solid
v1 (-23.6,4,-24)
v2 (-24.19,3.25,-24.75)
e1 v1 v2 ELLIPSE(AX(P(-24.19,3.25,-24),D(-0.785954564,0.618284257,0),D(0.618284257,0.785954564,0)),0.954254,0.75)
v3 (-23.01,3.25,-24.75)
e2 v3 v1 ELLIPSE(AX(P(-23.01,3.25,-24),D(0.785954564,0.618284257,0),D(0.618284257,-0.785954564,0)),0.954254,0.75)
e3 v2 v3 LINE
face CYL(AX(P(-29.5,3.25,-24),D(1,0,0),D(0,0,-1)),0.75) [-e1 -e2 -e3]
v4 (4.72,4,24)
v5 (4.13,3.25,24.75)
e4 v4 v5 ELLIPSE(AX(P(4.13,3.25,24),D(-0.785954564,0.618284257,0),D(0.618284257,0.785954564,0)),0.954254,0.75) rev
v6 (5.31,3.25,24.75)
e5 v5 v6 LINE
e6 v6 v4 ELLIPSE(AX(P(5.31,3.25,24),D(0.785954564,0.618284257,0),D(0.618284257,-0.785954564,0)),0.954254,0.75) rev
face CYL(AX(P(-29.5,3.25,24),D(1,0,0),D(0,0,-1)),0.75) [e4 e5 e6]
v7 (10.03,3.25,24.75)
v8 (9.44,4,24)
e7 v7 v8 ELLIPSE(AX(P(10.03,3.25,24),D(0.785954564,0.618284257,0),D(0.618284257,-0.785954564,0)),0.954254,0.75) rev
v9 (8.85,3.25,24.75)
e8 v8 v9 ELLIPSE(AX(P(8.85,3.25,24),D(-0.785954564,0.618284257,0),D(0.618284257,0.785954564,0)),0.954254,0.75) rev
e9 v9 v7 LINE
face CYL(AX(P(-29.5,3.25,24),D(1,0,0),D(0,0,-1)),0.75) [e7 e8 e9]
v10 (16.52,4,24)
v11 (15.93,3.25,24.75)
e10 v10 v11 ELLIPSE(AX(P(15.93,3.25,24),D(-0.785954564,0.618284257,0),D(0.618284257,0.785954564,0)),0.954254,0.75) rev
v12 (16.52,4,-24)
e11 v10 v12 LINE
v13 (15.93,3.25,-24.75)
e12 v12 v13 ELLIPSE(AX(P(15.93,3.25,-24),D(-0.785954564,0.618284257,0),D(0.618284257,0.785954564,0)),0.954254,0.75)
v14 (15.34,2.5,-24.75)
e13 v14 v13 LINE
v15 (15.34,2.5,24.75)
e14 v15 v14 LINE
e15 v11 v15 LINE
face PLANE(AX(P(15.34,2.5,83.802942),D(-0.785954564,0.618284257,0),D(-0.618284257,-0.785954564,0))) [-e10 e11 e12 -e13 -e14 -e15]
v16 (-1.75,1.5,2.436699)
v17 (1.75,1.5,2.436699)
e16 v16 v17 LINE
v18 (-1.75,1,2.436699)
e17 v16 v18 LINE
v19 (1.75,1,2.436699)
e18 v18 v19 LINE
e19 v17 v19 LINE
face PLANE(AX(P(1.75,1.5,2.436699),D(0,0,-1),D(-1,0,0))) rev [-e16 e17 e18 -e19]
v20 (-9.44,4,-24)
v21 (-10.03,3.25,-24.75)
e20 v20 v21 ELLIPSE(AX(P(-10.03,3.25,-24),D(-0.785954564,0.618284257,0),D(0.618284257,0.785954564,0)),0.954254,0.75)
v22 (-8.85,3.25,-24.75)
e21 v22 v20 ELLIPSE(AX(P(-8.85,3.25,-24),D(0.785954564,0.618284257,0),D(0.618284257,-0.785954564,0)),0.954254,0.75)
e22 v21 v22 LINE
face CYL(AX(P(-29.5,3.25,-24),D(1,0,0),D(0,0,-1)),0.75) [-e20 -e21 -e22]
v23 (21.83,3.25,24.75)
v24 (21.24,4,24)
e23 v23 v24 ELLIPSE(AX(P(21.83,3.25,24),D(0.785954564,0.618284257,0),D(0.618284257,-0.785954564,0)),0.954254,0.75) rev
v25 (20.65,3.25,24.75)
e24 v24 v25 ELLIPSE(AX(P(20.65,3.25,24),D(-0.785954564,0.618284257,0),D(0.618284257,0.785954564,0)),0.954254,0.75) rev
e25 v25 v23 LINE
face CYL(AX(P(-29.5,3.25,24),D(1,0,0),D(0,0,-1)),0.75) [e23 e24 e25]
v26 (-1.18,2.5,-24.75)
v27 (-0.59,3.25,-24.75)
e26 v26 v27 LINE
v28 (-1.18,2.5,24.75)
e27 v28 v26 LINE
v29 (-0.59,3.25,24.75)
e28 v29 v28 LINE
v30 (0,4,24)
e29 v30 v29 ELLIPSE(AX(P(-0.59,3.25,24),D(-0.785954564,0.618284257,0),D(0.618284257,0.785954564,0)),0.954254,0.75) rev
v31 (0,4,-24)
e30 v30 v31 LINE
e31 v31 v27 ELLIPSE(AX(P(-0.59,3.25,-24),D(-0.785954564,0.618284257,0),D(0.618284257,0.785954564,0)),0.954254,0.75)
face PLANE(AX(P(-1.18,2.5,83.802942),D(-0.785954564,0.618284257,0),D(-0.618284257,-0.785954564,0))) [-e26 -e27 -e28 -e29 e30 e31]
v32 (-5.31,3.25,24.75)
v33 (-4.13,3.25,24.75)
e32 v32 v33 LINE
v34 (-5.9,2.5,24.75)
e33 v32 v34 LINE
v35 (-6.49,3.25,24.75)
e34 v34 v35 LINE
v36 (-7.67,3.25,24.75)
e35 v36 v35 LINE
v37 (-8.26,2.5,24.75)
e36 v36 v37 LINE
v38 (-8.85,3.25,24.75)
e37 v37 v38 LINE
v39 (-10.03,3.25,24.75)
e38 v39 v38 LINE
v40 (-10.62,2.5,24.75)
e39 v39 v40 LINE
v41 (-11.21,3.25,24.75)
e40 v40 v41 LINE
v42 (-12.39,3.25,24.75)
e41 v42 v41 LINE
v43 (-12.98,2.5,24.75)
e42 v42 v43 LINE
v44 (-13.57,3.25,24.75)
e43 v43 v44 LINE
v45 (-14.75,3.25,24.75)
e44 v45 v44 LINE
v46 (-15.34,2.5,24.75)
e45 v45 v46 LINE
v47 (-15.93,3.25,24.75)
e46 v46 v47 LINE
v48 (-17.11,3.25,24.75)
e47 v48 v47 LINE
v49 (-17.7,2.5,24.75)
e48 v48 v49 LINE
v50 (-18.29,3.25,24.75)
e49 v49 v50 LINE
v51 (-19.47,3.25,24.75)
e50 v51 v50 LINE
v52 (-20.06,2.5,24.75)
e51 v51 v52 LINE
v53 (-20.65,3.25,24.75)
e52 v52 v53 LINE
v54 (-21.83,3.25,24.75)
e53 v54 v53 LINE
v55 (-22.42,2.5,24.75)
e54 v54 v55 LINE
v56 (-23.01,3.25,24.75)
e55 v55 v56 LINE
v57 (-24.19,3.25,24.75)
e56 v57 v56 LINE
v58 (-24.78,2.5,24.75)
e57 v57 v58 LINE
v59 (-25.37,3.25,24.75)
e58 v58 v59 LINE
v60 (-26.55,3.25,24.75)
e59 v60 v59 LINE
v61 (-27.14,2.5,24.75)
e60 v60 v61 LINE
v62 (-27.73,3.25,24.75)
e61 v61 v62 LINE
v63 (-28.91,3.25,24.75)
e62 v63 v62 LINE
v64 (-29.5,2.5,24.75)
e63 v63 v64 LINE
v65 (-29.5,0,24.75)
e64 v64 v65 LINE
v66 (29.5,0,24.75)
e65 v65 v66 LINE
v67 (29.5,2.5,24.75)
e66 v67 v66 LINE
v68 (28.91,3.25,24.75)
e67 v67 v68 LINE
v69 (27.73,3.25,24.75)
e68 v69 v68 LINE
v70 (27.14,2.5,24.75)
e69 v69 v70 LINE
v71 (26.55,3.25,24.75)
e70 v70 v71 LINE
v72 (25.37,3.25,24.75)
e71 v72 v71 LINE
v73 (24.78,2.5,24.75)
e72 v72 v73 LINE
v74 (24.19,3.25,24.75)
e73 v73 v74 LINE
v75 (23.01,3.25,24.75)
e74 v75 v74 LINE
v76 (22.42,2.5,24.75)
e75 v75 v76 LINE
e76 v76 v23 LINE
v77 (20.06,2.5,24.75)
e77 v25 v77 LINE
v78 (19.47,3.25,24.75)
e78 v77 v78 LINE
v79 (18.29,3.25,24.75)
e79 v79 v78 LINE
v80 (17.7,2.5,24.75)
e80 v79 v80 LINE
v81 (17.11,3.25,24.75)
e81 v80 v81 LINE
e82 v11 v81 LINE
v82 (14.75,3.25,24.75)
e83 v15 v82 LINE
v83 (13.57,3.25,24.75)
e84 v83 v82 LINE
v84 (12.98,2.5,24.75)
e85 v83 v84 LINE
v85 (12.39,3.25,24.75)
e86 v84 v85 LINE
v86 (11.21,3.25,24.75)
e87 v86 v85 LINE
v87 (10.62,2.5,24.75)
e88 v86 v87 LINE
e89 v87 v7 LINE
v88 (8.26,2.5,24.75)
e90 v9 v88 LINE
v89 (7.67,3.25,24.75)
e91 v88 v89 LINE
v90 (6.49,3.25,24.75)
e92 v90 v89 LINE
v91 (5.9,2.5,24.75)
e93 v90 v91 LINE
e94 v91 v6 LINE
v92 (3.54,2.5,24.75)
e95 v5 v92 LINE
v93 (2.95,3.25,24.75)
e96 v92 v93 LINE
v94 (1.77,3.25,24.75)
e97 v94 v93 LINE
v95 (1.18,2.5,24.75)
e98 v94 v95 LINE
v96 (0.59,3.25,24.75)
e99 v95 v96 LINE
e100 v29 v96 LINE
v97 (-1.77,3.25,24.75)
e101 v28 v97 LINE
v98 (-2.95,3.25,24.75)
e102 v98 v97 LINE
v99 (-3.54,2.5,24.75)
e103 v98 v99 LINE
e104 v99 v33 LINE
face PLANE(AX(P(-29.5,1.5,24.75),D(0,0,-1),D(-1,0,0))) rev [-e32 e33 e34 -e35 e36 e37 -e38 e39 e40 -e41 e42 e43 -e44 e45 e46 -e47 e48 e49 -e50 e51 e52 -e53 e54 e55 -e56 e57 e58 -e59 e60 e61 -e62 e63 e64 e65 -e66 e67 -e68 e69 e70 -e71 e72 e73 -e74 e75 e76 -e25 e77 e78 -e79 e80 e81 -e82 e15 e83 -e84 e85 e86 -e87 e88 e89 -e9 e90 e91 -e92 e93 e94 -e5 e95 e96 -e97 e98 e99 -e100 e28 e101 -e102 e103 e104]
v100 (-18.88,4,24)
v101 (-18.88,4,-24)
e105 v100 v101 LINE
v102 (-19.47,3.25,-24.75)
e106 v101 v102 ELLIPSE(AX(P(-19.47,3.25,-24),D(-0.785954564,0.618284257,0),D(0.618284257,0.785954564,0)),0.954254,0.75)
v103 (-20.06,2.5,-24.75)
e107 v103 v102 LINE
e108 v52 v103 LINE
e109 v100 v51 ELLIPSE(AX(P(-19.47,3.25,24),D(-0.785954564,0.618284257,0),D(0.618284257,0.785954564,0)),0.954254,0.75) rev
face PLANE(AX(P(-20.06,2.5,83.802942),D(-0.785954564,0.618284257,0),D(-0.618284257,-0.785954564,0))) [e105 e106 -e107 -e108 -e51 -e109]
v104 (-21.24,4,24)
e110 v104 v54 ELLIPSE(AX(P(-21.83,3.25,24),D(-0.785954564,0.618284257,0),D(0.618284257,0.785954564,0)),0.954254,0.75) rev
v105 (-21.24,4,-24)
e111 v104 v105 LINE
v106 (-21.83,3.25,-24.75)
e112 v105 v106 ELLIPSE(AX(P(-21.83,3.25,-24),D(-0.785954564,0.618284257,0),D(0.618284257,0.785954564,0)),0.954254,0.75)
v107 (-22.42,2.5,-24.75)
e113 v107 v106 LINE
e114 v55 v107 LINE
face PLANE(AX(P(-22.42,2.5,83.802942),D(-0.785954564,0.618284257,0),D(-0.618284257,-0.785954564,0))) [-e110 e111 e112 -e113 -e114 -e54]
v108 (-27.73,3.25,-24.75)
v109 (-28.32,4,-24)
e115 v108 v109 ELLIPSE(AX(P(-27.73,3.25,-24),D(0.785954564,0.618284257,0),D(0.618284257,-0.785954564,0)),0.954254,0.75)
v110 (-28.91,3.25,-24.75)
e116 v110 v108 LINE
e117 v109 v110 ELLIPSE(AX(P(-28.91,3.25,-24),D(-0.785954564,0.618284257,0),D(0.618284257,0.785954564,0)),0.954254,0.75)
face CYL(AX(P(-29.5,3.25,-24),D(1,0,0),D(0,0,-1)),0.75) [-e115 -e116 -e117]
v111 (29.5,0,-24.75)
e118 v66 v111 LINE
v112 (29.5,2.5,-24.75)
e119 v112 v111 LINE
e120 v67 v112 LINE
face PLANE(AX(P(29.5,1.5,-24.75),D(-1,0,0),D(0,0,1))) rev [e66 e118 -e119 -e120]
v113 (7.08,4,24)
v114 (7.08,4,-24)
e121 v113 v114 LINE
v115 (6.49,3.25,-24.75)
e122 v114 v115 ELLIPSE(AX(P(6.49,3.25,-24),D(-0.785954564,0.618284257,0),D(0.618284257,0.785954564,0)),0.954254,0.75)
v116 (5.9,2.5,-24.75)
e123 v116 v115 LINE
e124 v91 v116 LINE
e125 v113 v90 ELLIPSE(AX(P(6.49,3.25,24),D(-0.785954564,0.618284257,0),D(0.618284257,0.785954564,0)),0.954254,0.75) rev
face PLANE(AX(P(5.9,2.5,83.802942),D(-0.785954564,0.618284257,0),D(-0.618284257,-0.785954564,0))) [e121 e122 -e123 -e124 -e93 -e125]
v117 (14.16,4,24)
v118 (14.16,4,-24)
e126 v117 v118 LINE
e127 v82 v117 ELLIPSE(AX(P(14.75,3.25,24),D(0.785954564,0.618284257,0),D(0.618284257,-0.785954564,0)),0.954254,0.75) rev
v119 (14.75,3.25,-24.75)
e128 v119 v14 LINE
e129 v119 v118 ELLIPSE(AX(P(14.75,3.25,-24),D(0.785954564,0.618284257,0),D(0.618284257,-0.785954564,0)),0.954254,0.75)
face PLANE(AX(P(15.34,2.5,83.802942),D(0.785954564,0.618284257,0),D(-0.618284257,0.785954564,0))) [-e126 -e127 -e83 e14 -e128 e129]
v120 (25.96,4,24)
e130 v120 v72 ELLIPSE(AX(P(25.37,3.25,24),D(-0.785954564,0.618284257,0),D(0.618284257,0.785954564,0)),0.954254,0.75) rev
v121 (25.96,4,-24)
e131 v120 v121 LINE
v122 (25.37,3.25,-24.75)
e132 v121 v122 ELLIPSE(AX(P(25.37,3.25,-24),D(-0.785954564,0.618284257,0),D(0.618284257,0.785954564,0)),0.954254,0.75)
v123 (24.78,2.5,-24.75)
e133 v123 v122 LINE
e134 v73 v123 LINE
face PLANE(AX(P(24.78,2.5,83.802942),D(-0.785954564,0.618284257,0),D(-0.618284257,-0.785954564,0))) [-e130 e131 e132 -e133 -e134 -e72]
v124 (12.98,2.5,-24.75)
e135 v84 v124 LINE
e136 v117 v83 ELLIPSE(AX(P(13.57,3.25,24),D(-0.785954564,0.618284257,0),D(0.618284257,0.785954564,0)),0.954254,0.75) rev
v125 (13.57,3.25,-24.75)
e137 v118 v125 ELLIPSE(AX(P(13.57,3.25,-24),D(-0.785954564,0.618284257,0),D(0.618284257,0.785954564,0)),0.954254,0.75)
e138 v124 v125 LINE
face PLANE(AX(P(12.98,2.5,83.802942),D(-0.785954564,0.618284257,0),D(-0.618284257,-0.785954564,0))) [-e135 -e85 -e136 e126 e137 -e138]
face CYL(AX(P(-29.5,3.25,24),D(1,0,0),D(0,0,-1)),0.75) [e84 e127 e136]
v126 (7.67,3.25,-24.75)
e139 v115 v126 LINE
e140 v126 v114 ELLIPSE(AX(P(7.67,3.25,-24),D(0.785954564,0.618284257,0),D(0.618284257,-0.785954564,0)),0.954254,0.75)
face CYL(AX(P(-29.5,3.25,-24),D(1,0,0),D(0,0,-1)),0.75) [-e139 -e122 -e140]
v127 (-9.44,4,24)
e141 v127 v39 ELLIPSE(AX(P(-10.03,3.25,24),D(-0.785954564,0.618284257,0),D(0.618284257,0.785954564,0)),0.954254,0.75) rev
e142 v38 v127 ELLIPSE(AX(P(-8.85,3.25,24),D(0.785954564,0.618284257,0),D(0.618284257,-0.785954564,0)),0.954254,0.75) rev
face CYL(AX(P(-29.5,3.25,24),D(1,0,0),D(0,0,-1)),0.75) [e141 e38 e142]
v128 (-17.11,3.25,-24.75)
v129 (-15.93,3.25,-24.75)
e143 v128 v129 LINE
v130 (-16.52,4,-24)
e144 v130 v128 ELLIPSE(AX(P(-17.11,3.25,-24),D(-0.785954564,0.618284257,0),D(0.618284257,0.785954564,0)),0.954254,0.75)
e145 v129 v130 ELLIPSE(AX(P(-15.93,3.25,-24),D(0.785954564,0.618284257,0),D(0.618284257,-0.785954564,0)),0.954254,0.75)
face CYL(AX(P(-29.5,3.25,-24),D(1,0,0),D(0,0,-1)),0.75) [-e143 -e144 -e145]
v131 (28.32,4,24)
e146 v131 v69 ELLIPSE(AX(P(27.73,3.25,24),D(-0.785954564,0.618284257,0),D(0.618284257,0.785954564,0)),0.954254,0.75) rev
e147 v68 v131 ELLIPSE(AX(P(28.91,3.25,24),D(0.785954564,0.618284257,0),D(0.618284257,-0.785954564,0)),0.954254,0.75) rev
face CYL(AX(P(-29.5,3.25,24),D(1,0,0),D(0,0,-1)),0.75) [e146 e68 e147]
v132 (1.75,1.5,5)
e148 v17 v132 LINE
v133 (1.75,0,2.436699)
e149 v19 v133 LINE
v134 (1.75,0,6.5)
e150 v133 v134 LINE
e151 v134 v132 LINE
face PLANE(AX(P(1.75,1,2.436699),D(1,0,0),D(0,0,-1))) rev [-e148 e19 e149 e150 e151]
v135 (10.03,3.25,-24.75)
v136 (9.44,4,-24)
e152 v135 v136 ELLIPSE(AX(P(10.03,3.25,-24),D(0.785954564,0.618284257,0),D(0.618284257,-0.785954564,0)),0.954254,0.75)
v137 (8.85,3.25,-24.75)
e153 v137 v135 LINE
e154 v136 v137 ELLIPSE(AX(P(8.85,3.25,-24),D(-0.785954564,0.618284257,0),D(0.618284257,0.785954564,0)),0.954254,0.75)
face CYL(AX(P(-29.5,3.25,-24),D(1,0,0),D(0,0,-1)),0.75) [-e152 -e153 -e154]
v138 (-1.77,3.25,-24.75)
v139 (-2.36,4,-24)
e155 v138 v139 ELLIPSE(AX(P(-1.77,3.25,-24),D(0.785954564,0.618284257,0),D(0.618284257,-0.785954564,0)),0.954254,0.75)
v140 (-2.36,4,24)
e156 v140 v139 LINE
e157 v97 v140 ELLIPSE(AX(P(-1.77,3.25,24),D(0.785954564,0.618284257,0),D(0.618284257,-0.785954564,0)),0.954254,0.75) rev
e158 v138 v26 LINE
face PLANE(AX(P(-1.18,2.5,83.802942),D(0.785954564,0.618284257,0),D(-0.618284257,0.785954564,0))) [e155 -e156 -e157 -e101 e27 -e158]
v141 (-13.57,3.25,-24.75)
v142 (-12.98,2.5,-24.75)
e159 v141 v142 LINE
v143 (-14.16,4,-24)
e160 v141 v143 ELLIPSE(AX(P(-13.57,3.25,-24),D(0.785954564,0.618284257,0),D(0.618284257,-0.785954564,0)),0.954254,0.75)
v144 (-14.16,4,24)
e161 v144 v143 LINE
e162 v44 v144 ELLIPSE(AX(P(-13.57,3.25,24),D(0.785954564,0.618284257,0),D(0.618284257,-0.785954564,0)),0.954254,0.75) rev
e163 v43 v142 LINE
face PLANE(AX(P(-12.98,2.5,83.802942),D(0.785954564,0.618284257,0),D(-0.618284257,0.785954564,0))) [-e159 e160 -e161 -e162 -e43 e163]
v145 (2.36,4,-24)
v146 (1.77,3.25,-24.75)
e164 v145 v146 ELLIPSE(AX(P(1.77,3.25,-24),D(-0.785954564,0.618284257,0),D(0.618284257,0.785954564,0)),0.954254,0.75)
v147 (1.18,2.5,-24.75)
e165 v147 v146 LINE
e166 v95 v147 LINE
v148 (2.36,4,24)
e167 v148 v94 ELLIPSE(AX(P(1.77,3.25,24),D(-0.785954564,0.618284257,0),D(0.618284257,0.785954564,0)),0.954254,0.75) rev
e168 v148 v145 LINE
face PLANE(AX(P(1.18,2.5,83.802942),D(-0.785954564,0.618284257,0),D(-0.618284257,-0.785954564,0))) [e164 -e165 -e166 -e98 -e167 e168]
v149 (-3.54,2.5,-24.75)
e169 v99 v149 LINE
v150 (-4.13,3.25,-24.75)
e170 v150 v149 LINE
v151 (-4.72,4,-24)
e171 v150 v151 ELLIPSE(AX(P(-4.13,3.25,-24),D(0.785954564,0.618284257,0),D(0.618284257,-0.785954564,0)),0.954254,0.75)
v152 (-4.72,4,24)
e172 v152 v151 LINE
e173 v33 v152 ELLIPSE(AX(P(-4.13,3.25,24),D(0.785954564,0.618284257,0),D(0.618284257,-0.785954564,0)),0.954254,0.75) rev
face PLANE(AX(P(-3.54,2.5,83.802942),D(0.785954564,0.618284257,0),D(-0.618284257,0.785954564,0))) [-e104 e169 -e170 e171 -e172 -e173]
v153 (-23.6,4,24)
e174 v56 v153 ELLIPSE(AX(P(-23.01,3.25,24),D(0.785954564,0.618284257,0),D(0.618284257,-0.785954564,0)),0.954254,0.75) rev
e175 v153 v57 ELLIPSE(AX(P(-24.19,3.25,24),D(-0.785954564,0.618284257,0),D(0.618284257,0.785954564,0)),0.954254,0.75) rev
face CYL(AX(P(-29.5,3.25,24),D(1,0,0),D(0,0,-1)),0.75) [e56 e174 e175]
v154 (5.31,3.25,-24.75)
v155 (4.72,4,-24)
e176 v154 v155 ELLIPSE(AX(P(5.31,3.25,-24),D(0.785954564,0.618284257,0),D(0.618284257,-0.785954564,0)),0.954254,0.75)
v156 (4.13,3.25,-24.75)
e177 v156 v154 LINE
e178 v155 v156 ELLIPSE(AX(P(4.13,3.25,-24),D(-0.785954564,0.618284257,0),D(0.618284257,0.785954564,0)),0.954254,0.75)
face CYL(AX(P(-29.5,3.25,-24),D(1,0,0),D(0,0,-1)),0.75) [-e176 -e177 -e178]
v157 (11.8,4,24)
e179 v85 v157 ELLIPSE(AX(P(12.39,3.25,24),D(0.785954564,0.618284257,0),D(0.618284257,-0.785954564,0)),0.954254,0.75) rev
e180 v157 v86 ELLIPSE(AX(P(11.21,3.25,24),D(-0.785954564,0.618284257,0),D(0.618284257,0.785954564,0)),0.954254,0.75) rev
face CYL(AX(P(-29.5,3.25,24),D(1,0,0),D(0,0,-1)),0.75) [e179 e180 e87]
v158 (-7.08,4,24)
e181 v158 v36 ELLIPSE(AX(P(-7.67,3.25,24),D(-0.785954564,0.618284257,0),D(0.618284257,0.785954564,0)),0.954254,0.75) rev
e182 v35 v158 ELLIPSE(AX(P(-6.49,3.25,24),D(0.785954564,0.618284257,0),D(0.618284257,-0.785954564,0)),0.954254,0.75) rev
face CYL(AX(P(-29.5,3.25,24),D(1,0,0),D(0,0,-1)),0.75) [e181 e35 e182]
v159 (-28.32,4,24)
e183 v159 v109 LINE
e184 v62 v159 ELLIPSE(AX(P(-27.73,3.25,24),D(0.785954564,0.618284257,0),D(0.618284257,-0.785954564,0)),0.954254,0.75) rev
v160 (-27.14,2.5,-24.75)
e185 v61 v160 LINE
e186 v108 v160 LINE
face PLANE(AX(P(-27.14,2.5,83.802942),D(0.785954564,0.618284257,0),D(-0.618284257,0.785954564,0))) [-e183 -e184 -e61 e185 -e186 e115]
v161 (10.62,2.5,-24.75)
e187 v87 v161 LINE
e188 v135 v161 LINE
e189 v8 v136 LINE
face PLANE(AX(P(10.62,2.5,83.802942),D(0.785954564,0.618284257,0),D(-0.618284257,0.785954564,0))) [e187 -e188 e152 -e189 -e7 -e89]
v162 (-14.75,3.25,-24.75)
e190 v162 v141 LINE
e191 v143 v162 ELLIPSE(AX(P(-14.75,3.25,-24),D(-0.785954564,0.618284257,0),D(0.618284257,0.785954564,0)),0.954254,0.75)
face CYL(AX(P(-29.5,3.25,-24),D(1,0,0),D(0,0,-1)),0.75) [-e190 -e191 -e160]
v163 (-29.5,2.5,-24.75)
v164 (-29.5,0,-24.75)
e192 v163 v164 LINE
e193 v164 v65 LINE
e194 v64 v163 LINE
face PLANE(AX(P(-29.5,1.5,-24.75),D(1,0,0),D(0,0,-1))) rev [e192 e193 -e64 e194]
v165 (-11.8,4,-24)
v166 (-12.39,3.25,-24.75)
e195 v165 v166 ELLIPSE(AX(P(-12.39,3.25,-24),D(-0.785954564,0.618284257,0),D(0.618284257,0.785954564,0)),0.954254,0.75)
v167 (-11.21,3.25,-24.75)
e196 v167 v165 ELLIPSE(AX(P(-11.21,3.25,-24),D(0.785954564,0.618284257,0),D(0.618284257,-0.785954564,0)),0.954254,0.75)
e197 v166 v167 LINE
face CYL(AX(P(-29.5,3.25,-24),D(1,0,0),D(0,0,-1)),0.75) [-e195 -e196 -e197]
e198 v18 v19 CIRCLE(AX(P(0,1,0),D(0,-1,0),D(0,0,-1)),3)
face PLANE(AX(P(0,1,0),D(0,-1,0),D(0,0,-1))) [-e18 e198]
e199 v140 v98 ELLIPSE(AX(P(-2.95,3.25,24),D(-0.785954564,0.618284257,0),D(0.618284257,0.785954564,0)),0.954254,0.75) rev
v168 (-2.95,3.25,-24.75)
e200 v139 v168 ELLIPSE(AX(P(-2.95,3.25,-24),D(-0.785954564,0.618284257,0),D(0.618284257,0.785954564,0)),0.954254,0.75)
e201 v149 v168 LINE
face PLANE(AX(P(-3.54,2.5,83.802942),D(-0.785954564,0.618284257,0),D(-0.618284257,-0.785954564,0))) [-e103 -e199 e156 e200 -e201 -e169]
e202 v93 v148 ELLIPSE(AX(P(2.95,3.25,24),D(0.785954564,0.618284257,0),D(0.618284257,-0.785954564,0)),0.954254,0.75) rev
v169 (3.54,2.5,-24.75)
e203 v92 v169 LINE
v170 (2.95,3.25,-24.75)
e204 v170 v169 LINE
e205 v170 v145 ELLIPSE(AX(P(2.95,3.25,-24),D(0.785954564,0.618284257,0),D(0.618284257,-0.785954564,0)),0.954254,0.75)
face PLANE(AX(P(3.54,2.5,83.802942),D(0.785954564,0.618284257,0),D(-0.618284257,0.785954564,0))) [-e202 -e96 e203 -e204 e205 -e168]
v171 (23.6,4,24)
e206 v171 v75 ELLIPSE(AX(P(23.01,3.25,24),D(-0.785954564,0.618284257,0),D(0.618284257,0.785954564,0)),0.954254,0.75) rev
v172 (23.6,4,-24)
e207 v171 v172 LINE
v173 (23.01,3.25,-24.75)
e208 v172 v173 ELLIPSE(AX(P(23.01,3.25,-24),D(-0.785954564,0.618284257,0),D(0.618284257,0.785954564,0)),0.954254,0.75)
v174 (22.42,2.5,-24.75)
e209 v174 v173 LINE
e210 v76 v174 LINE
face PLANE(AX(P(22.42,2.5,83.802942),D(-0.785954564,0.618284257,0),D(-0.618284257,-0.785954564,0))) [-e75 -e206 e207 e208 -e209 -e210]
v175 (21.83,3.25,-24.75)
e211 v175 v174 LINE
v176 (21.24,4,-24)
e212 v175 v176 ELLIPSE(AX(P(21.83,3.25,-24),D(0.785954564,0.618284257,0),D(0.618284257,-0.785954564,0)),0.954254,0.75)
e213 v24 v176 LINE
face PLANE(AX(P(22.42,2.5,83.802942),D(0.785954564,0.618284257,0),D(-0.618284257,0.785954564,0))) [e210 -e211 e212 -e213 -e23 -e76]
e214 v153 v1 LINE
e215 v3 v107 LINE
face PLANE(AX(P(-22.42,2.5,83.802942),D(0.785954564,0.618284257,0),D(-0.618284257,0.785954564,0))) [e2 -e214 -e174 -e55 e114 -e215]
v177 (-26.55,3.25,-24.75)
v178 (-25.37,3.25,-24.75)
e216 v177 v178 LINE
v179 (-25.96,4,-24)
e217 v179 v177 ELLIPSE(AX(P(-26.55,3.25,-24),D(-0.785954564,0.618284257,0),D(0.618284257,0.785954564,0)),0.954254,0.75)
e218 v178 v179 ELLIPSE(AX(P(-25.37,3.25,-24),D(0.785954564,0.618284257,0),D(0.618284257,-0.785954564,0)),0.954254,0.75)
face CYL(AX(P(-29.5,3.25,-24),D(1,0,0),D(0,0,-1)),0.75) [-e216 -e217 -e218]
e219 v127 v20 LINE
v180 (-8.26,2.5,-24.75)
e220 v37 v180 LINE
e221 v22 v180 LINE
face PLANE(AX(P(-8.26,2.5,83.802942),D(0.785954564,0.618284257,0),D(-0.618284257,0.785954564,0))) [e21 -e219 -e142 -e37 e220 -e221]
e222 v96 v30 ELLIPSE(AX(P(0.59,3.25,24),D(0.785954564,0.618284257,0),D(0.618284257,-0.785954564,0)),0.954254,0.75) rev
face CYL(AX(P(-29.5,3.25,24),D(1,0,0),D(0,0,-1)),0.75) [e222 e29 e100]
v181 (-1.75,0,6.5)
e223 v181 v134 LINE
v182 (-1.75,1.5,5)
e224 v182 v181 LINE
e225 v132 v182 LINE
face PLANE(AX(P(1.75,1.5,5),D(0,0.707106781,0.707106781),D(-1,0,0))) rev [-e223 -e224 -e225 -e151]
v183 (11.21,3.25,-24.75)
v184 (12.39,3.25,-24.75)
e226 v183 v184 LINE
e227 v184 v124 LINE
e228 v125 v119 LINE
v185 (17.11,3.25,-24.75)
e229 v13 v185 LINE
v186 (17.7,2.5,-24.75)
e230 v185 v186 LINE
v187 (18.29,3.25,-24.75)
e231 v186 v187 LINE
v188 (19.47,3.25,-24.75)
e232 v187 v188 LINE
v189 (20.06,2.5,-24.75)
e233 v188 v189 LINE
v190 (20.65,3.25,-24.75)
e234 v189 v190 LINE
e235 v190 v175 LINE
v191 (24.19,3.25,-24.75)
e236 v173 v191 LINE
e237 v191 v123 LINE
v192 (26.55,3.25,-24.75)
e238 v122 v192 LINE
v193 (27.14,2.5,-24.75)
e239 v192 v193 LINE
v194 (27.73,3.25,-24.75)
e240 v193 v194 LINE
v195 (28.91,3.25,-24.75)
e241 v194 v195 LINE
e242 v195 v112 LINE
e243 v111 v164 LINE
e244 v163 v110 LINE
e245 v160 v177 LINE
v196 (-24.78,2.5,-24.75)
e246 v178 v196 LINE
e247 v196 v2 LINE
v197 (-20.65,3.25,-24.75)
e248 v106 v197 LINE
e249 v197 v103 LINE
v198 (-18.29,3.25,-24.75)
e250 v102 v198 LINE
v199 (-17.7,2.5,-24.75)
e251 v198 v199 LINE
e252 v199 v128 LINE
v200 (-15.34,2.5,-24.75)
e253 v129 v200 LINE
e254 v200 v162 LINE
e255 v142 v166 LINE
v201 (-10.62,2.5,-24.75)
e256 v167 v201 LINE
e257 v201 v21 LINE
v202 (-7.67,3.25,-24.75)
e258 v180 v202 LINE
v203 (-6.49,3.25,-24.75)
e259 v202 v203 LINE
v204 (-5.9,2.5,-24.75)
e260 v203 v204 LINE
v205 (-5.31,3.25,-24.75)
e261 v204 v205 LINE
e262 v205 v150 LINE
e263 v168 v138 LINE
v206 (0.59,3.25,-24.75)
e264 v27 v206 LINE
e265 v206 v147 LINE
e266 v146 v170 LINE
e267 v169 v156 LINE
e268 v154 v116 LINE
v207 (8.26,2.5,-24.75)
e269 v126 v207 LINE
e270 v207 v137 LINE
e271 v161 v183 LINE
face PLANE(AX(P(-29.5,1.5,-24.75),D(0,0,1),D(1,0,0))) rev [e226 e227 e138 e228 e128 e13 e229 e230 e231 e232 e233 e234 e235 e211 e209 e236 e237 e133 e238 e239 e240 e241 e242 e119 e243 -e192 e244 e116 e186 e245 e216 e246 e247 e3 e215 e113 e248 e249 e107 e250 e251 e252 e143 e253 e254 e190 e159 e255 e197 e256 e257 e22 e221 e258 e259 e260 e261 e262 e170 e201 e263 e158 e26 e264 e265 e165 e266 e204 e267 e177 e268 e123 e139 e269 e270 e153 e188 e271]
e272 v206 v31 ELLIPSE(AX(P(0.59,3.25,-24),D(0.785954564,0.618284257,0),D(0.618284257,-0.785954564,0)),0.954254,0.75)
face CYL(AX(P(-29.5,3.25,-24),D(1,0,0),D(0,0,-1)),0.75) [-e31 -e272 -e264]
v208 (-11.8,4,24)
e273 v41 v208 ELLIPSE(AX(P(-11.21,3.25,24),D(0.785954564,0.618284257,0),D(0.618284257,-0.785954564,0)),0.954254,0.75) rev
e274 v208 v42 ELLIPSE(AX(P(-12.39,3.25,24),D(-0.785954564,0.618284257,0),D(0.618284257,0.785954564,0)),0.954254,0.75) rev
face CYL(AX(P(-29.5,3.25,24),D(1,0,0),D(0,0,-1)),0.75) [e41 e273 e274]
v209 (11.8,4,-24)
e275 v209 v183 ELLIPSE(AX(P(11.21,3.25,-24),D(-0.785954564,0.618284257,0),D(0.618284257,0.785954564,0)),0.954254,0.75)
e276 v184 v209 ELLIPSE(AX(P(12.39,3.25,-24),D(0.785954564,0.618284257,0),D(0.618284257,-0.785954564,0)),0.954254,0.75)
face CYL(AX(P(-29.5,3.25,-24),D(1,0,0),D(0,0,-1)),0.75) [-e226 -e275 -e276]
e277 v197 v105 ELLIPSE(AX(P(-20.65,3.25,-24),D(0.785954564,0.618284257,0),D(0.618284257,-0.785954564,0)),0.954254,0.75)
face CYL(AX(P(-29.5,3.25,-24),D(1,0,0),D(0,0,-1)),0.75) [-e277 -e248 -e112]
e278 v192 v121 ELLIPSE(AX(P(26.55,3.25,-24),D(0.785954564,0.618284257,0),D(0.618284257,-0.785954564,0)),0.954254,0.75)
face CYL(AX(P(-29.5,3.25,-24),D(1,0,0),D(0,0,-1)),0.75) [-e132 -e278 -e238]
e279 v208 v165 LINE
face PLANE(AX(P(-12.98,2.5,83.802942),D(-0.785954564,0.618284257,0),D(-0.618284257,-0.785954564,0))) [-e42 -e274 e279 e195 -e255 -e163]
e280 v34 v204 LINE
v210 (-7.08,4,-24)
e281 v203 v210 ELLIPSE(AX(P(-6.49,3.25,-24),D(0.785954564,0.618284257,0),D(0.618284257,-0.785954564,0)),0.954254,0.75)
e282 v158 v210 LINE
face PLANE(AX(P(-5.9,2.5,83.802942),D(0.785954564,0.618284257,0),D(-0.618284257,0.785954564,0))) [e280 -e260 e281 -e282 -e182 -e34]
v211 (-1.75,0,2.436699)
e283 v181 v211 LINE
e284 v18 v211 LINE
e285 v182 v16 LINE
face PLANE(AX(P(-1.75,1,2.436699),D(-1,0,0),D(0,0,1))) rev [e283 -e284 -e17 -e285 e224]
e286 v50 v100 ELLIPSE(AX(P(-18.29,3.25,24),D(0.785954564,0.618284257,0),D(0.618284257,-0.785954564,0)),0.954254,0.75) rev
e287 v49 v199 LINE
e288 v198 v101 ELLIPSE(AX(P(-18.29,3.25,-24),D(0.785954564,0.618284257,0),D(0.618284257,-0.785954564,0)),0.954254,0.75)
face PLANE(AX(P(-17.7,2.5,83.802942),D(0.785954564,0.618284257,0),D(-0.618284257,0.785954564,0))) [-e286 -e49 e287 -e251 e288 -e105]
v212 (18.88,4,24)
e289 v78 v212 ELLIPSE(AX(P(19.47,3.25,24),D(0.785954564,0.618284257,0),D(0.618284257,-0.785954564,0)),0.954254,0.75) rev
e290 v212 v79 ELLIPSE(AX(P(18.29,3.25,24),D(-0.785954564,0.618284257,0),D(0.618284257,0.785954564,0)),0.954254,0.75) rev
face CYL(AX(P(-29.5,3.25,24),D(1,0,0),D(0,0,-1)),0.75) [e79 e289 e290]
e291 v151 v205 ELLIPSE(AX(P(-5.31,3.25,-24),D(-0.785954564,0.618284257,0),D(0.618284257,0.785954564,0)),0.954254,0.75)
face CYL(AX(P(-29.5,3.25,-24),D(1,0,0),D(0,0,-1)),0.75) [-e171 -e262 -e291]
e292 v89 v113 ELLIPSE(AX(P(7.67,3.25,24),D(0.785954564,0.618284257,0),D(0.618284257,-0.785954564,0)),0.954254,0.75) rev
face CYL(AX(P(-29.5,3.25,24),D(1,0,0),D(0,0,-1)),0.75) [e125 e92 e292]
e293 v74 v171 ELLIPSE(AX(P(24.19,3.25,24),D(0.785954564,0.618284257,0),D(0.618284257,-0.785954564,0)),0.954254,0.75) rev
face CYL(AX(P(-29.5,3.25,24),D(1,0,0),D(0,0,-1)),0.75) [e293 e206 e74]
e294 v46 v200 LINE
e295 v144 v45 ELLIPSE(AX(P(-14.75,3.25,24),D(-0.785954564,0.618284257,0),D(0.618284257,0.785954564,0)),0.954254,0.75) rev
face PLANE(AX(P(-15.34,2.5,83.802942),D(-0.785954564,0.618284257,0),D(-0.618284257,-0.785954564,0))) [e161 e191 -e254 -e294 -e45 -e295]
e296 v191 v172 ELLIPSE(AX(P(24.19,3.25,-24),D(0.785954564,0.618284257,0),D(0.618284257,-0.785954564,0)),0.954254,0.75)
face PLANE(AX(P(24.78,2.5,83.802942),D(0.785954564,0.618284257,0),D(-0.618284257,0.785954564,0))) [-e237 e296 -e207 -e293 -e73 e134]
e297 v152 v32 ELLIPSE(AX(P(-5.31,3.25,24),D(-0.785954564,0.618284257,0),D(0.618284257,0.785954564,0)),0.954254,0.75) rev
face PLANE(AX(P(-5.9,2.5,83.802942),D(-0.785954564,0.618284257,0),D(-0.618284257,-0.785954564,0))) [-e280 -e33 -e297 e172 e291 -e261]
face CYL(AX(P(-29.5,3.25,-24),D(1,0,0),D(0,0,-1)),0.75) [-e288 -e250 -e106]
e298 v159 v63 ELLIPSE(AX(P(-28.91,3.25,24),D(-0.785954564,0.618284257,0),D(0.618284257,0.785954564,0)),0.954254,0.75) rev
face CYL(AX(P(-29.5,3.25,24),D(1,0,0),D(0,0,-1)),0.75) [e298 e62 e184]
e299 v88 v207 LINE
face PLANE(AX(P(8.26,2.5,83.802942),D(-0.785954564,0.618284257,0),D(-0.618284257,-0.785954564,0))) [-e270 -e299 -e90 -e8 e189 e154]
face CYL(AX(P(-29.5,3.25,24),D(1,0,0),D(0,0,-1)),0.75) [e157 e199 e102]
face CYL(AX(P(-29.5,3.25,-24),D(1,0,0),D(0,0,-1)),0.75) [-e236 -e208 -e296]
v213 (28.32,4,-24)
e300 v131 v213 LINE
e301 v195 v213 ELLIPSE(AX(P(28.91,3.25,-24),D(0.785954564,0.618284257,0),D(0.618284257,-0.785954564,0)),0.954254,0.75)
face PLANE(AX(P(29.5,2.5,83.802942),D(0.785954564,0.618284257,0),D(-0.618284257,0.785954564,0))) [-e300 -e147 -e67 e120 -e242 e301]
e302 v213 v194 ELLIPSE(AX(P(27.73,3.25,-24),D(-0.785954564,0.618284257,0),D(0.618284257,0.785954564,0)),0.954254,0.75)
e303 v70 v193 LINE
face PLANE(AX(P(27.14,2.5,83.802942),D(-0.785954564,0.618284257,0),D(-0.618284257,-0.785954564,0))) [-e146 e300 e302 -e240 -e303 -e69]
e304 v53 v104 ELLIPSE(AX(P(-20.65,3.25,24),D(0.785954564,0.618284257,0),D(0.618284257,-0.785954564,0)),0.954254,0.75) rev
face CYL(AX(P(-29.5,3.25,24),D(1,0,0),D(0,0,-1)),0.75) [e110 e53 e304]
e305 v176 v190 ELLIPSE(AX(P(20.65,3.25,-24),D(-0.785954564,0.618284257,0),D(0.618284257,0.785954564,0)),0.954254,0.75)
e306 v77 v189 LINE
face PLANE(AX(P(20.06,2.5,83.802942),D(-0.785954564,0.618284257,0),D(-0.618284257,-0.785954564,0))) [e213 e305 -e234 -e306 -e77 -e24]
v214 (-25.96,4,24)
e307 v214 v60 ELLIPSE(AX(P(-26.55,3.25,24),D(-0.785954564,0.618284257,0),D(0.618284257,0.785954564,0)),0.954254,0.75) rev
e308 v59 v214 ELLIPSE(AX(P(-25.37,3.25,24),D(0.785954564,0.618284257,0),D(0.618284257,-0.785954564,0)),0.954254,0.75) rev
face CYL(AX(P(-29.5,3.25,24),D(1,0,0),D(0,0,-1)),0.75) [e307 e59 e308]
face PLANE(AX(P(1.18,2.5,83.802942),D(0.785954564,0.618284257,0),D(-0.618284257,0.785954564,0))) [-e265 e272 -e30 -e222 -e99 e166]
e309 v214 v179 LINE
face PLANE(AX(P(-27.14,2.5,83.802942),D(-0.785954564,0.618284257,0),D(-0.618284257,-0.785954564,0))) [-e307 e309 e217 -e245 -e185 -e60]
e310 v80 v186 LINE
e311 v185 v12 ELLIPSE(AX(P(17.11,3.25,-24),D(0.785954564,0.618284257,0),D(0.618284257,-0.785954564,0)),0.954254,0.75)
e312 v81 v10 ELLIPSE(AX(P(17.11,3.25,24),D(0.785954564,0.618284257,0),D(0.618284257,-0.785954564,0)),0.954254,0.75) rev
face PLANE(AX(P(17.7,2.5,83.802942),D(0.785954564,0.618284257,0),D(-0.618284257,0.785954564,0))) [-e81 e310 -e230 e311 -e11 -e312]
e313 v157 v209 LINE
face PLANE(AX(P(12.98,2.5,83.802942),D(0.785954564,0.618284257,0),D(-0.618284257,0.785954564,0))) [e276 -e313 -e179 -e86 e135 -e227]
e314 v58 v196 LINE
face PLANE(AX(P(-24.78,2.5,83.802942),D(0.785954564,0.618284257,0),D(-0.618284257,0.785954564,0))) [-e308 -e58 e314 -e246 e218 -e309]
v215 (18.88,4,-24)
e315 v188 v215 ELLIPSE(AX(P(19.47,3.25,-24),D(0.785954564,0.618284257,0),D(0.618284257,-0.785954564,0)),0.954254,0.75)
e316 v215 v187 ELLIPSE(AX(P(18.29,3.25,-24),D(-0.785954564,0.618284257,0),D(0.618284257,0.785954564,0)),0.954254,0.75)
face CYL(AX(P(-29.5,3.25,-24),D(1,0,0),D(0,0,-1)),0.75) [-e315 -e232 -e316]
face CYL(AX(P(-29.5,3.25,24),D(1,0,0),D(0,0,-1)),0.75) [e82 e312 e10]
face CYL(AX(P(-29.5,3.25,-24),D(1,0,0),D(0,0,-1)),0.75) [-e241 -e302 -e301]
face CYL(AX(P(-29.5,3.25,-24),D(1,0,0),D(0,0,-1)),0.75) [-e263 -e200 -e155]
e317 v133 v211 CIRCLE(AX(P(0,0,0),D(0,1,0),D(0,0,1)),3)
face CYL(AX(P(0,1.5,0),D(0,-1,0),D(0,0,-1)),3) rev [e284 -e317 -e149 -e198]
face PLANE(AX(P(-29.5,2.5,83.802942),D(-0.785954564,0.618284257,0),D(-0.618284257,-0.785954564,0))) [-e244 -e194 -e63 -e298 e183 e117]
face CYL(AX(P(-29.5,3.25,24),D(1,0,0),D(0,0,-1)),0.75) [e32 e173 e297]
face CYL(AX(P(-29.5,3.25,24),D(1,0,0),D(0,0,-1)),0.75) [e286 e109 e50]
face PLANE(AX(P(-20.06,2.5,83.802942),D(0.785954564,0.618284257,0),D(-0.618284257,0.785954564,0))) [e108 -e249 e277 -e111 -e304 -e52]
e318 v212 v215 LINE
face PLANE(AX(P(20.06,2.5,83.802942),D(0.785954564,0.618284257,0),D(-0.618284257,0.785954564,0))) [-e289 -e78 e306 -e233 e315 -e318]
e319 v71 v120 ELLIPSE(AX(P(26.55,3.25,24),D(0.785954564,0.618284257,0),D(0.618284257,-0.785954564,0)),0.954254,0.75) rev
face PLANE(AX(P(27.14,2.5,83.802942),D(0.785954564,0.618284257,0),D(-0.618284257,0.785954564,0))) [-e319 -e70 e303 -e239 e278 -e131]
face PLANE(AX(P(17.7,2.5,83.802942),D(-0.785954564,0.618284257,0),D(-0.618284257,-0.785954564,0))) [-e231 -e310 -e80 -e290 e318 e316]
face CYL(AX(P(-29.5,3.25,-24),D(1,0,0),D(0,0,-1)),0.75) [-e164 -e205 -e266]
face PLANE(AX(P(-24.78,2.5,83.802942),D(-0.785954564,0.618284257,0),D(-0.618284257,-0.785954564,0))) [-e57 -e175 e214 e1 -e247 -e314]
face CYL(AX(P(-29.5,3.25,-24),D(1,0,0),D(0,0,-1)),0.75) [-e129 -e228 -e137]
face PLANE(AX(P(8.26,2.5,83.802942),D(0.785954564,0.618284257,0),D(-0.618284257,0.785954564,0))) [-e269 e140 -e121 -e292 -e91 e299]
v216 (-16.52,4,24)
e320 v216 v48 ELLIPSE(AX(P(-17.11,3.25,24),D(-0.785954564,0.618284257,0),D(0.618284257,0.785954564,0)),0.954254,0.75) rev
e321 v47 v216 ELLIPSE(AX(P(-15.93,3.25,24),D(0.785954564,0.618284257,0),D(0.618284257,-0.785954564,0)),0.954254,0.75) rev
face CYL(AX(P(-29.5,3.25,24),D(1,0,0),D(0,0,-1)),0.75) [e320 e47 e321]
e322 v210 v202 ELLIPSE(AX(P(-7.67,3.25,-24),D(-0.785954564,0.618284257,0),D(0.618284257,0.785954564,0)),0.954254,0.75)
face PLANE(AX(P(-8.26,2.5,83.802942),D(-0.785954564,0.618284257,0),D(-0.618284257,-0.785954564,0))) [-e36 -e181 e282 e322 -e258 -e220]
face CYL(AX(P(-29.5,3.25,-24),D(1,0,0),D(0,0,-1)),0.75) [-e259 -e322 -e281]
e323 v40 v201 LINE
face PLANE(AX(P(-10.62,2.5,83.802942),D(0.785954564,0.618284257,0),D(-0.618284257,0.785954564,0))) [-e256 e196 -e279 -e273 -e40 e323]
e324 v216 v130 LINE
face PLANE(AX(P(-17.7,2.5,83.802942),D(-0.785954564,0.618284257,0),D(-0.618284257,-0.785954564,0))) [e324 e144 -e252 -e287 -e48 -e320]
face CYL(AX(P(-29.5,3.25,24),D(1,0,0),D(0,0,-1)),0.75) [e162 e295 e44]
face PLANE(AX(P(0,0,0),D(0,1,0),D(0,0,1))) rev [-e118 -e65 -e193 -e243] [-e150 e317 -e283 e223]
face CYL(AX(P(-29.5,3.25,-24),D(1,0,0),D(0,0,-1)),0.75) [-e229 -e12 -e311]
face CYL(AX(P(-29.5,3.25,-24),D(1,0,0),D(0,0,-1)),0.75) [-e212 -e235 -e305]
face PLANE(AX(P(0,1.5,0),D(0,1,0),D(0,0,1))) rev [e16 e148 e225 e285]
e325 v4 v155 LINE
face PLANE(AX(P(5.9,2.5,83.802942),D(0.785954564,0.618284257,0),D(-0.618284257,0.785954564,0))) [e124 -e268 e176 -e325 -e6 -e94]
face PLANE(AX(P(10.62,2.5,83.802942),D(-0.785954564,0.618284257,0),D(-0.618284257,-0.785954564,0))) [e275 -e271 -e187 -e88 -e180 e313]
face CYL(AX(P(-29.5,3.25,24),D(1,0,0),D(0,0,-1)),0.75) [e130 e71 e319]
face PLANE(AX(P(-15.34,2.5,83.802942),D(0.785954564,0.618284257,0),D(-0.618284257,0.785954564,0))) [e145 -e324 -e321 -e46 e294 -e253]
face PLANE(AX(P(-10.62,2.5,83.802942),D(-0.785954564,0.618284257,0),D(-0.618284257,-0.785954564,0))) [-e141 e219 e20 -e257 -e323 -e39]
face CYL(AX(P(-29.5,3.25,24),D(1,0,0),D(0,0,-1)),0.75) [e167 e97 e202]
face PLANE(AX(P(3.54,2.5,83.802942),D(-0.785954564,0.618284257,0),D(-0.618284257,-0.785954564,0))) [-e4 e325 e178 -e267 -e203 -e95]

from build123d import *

# Parameters (mm, degrees)
SKETCH1_W           = 59
SKETCH1_H           = 49.5
SKETCH1_R           = 3
BOSS_EXTRUDE1_DEPTH = 1.5
BOSS_EXTRUDE2_DEPTH = 49.5
CUT_EXTRUDE1_DEPTH  = 1
CUT_EXTRUDE3_DEPTH  = 65.105869466
BOSS_EXTRUDE3_START = 0.5
SKETCH5_R           = 3
BOSS_EXTRUDE3_DEPTH = 0.5
SKETCH6_W           = 3.5
SKETCH6_H           = 2.563301414
CUT_EXTRUDE4_DEPTH  = 0.5
CHAMFER3_SIZE       = 1.5


with BuildPart() as part:
    # Sketch1 → Boss-Extrude1 (new body)
    with BuildSketch(Plane(origin=(0, 0, 0), x_dir=(1, 0, 0), z_dir=(0, 1, 0))):
        Rectangle(SKETCH1_W, SKETCH1_H)
        with Locations(Location((0, 0, 0), (0, 0, 270))):
            Circle(SKETCH1_R, mode=Mode.SUBTRACT)
    extrude(amount=BOSS_EXTRUDE1_DEPTH)

    # Sketch2 → Boss-Extrude2 (add)
    with BuildSketch(Plane(origin=(0, 0, -24.75), x_dir=(-1, 0, 0), z_dir=(0, 0, -1))):
        Polygon((-29.5, 1.5), (29.5, 1.5), (29.5, 2.5), (28.32, 4), (27.14, 2.5), (25.96, 4), (24.78, 2.5), (23.6, 4), (22.42, 2.5), (21.24, 4), (20.06, 2.5), (18.88, 4), (17.7, 2.5), (16.52, 4), (15.34, 2.5), (14.16, 4), (12.98, 2.5), (11.8, 4), (10.62, 2.5), (9.44, 4), (8.26, 2.5), (7.08, 4), (5.9, 2.5), (4.72, 4), (3.54, 2.5), (2.36, 4), (1.18, 2.5), (0, 4), (-1.18, 2.5), (-2.36, 4), (-3.54, 2.5), (-4.72, 4), (-5.9, 2.5), (-7.08, 4), (-8.26, 2.5), (-9.44, 4), (-10.62, 2.5), (-11.8, 4), (-12.98, 2.5), (-14.16, 4), (-15.34, 2.5), (-16.52, 4), (-17.7, 2.5), (-18.88, 4), (-20.06, 2.5), (-21.24, 4), (-22.42, 2.5), (-23.6, 4), (-24.78, 2.5), (-25.96, 4), (-27.14, 2.5), (-28.32, 4), (-29.5, 2.5), align=None)
    extrude(amount=-BOSS_EXTRUDE2_DEPTH)

    # Sketch3 → Cut-Extrude1 (cut)
    with BuildSketch(Plane(origin=(0, 0, 0), x_dir=(-1, 0, 0), z_dir=(0, -1, 0))):
        with BuildLine():
            Line((-1.75, -2.436698586), (-1.75, -5))
            Line((-1.75, -5), (1.75, -5))
            Line((1.75, -5), (1.75, -2.436698586))
            ThreePointArc((1.75, -2.436698586), (0, 3), (-1.75, -2.436698586))
        make_face()
    extrude(amount=-CUT_EXTRUDE1_DEPTH, mode=Mode.SUBTRACT)

    # Sketch4 → Cut-Extrude3 (cut, through all)
    with BuildSketch(Plane(origin=(29.5, 0, 0), x_dir=(0, 0, -1), z_dir=(1, 0, 0))):
        with BuildLine():
            Line((-24, 4), (-24.75, 4))
            Line((-24.75, 4), (-24.75, 3.25))
            ThreePointArc((-24.75, 3.25), (-24.530330086, 3.780330086), (-24, 4))
        make_face()
    cut_extrude3 = extrude(amount=-CUT_EXTRUDE3_DEPTH, mode=Mode.SUBTRACT)

    # Mirror1: Cut-Extrude3 across plane
    add(cut_extrude3.mirror(Plane.XY), mode=Mode.SUBTRACT)

    # Sketch5 → Boss-Extrude3 (add)
    with BuildSketch(Plane.XZ.offset(-1.5).offset(BOSS_EXTRUDE3_START)):
        Circle(SKETCH5_R)
    extrude(amount=-BOSS_EXTRUDE3_DEPTH)

    # Sketch6 → Cut-Extrude4 (cut)
    with BuildSketch(Plane.XZ.offset(-1)):
        with Locations((0, 3.718349293)):
            Rectangle(SKETCH6_W, SKETCH6_H)
    extrude(amount=-CUT_EXTRUDE4_DEPTH, mode=Mode.SUBTRACT)

    # Chamfer3
    chamfer3_edges = [part.edges().sort_by_distance(p)[0] for p in [
        (0, 0, 5),
    ]]
    chamfer(chamfer3_edges, length=CHAMFER3_SIZE - 0.0001)  # a hair under: the kernel refuses the full size


solid = part.part
